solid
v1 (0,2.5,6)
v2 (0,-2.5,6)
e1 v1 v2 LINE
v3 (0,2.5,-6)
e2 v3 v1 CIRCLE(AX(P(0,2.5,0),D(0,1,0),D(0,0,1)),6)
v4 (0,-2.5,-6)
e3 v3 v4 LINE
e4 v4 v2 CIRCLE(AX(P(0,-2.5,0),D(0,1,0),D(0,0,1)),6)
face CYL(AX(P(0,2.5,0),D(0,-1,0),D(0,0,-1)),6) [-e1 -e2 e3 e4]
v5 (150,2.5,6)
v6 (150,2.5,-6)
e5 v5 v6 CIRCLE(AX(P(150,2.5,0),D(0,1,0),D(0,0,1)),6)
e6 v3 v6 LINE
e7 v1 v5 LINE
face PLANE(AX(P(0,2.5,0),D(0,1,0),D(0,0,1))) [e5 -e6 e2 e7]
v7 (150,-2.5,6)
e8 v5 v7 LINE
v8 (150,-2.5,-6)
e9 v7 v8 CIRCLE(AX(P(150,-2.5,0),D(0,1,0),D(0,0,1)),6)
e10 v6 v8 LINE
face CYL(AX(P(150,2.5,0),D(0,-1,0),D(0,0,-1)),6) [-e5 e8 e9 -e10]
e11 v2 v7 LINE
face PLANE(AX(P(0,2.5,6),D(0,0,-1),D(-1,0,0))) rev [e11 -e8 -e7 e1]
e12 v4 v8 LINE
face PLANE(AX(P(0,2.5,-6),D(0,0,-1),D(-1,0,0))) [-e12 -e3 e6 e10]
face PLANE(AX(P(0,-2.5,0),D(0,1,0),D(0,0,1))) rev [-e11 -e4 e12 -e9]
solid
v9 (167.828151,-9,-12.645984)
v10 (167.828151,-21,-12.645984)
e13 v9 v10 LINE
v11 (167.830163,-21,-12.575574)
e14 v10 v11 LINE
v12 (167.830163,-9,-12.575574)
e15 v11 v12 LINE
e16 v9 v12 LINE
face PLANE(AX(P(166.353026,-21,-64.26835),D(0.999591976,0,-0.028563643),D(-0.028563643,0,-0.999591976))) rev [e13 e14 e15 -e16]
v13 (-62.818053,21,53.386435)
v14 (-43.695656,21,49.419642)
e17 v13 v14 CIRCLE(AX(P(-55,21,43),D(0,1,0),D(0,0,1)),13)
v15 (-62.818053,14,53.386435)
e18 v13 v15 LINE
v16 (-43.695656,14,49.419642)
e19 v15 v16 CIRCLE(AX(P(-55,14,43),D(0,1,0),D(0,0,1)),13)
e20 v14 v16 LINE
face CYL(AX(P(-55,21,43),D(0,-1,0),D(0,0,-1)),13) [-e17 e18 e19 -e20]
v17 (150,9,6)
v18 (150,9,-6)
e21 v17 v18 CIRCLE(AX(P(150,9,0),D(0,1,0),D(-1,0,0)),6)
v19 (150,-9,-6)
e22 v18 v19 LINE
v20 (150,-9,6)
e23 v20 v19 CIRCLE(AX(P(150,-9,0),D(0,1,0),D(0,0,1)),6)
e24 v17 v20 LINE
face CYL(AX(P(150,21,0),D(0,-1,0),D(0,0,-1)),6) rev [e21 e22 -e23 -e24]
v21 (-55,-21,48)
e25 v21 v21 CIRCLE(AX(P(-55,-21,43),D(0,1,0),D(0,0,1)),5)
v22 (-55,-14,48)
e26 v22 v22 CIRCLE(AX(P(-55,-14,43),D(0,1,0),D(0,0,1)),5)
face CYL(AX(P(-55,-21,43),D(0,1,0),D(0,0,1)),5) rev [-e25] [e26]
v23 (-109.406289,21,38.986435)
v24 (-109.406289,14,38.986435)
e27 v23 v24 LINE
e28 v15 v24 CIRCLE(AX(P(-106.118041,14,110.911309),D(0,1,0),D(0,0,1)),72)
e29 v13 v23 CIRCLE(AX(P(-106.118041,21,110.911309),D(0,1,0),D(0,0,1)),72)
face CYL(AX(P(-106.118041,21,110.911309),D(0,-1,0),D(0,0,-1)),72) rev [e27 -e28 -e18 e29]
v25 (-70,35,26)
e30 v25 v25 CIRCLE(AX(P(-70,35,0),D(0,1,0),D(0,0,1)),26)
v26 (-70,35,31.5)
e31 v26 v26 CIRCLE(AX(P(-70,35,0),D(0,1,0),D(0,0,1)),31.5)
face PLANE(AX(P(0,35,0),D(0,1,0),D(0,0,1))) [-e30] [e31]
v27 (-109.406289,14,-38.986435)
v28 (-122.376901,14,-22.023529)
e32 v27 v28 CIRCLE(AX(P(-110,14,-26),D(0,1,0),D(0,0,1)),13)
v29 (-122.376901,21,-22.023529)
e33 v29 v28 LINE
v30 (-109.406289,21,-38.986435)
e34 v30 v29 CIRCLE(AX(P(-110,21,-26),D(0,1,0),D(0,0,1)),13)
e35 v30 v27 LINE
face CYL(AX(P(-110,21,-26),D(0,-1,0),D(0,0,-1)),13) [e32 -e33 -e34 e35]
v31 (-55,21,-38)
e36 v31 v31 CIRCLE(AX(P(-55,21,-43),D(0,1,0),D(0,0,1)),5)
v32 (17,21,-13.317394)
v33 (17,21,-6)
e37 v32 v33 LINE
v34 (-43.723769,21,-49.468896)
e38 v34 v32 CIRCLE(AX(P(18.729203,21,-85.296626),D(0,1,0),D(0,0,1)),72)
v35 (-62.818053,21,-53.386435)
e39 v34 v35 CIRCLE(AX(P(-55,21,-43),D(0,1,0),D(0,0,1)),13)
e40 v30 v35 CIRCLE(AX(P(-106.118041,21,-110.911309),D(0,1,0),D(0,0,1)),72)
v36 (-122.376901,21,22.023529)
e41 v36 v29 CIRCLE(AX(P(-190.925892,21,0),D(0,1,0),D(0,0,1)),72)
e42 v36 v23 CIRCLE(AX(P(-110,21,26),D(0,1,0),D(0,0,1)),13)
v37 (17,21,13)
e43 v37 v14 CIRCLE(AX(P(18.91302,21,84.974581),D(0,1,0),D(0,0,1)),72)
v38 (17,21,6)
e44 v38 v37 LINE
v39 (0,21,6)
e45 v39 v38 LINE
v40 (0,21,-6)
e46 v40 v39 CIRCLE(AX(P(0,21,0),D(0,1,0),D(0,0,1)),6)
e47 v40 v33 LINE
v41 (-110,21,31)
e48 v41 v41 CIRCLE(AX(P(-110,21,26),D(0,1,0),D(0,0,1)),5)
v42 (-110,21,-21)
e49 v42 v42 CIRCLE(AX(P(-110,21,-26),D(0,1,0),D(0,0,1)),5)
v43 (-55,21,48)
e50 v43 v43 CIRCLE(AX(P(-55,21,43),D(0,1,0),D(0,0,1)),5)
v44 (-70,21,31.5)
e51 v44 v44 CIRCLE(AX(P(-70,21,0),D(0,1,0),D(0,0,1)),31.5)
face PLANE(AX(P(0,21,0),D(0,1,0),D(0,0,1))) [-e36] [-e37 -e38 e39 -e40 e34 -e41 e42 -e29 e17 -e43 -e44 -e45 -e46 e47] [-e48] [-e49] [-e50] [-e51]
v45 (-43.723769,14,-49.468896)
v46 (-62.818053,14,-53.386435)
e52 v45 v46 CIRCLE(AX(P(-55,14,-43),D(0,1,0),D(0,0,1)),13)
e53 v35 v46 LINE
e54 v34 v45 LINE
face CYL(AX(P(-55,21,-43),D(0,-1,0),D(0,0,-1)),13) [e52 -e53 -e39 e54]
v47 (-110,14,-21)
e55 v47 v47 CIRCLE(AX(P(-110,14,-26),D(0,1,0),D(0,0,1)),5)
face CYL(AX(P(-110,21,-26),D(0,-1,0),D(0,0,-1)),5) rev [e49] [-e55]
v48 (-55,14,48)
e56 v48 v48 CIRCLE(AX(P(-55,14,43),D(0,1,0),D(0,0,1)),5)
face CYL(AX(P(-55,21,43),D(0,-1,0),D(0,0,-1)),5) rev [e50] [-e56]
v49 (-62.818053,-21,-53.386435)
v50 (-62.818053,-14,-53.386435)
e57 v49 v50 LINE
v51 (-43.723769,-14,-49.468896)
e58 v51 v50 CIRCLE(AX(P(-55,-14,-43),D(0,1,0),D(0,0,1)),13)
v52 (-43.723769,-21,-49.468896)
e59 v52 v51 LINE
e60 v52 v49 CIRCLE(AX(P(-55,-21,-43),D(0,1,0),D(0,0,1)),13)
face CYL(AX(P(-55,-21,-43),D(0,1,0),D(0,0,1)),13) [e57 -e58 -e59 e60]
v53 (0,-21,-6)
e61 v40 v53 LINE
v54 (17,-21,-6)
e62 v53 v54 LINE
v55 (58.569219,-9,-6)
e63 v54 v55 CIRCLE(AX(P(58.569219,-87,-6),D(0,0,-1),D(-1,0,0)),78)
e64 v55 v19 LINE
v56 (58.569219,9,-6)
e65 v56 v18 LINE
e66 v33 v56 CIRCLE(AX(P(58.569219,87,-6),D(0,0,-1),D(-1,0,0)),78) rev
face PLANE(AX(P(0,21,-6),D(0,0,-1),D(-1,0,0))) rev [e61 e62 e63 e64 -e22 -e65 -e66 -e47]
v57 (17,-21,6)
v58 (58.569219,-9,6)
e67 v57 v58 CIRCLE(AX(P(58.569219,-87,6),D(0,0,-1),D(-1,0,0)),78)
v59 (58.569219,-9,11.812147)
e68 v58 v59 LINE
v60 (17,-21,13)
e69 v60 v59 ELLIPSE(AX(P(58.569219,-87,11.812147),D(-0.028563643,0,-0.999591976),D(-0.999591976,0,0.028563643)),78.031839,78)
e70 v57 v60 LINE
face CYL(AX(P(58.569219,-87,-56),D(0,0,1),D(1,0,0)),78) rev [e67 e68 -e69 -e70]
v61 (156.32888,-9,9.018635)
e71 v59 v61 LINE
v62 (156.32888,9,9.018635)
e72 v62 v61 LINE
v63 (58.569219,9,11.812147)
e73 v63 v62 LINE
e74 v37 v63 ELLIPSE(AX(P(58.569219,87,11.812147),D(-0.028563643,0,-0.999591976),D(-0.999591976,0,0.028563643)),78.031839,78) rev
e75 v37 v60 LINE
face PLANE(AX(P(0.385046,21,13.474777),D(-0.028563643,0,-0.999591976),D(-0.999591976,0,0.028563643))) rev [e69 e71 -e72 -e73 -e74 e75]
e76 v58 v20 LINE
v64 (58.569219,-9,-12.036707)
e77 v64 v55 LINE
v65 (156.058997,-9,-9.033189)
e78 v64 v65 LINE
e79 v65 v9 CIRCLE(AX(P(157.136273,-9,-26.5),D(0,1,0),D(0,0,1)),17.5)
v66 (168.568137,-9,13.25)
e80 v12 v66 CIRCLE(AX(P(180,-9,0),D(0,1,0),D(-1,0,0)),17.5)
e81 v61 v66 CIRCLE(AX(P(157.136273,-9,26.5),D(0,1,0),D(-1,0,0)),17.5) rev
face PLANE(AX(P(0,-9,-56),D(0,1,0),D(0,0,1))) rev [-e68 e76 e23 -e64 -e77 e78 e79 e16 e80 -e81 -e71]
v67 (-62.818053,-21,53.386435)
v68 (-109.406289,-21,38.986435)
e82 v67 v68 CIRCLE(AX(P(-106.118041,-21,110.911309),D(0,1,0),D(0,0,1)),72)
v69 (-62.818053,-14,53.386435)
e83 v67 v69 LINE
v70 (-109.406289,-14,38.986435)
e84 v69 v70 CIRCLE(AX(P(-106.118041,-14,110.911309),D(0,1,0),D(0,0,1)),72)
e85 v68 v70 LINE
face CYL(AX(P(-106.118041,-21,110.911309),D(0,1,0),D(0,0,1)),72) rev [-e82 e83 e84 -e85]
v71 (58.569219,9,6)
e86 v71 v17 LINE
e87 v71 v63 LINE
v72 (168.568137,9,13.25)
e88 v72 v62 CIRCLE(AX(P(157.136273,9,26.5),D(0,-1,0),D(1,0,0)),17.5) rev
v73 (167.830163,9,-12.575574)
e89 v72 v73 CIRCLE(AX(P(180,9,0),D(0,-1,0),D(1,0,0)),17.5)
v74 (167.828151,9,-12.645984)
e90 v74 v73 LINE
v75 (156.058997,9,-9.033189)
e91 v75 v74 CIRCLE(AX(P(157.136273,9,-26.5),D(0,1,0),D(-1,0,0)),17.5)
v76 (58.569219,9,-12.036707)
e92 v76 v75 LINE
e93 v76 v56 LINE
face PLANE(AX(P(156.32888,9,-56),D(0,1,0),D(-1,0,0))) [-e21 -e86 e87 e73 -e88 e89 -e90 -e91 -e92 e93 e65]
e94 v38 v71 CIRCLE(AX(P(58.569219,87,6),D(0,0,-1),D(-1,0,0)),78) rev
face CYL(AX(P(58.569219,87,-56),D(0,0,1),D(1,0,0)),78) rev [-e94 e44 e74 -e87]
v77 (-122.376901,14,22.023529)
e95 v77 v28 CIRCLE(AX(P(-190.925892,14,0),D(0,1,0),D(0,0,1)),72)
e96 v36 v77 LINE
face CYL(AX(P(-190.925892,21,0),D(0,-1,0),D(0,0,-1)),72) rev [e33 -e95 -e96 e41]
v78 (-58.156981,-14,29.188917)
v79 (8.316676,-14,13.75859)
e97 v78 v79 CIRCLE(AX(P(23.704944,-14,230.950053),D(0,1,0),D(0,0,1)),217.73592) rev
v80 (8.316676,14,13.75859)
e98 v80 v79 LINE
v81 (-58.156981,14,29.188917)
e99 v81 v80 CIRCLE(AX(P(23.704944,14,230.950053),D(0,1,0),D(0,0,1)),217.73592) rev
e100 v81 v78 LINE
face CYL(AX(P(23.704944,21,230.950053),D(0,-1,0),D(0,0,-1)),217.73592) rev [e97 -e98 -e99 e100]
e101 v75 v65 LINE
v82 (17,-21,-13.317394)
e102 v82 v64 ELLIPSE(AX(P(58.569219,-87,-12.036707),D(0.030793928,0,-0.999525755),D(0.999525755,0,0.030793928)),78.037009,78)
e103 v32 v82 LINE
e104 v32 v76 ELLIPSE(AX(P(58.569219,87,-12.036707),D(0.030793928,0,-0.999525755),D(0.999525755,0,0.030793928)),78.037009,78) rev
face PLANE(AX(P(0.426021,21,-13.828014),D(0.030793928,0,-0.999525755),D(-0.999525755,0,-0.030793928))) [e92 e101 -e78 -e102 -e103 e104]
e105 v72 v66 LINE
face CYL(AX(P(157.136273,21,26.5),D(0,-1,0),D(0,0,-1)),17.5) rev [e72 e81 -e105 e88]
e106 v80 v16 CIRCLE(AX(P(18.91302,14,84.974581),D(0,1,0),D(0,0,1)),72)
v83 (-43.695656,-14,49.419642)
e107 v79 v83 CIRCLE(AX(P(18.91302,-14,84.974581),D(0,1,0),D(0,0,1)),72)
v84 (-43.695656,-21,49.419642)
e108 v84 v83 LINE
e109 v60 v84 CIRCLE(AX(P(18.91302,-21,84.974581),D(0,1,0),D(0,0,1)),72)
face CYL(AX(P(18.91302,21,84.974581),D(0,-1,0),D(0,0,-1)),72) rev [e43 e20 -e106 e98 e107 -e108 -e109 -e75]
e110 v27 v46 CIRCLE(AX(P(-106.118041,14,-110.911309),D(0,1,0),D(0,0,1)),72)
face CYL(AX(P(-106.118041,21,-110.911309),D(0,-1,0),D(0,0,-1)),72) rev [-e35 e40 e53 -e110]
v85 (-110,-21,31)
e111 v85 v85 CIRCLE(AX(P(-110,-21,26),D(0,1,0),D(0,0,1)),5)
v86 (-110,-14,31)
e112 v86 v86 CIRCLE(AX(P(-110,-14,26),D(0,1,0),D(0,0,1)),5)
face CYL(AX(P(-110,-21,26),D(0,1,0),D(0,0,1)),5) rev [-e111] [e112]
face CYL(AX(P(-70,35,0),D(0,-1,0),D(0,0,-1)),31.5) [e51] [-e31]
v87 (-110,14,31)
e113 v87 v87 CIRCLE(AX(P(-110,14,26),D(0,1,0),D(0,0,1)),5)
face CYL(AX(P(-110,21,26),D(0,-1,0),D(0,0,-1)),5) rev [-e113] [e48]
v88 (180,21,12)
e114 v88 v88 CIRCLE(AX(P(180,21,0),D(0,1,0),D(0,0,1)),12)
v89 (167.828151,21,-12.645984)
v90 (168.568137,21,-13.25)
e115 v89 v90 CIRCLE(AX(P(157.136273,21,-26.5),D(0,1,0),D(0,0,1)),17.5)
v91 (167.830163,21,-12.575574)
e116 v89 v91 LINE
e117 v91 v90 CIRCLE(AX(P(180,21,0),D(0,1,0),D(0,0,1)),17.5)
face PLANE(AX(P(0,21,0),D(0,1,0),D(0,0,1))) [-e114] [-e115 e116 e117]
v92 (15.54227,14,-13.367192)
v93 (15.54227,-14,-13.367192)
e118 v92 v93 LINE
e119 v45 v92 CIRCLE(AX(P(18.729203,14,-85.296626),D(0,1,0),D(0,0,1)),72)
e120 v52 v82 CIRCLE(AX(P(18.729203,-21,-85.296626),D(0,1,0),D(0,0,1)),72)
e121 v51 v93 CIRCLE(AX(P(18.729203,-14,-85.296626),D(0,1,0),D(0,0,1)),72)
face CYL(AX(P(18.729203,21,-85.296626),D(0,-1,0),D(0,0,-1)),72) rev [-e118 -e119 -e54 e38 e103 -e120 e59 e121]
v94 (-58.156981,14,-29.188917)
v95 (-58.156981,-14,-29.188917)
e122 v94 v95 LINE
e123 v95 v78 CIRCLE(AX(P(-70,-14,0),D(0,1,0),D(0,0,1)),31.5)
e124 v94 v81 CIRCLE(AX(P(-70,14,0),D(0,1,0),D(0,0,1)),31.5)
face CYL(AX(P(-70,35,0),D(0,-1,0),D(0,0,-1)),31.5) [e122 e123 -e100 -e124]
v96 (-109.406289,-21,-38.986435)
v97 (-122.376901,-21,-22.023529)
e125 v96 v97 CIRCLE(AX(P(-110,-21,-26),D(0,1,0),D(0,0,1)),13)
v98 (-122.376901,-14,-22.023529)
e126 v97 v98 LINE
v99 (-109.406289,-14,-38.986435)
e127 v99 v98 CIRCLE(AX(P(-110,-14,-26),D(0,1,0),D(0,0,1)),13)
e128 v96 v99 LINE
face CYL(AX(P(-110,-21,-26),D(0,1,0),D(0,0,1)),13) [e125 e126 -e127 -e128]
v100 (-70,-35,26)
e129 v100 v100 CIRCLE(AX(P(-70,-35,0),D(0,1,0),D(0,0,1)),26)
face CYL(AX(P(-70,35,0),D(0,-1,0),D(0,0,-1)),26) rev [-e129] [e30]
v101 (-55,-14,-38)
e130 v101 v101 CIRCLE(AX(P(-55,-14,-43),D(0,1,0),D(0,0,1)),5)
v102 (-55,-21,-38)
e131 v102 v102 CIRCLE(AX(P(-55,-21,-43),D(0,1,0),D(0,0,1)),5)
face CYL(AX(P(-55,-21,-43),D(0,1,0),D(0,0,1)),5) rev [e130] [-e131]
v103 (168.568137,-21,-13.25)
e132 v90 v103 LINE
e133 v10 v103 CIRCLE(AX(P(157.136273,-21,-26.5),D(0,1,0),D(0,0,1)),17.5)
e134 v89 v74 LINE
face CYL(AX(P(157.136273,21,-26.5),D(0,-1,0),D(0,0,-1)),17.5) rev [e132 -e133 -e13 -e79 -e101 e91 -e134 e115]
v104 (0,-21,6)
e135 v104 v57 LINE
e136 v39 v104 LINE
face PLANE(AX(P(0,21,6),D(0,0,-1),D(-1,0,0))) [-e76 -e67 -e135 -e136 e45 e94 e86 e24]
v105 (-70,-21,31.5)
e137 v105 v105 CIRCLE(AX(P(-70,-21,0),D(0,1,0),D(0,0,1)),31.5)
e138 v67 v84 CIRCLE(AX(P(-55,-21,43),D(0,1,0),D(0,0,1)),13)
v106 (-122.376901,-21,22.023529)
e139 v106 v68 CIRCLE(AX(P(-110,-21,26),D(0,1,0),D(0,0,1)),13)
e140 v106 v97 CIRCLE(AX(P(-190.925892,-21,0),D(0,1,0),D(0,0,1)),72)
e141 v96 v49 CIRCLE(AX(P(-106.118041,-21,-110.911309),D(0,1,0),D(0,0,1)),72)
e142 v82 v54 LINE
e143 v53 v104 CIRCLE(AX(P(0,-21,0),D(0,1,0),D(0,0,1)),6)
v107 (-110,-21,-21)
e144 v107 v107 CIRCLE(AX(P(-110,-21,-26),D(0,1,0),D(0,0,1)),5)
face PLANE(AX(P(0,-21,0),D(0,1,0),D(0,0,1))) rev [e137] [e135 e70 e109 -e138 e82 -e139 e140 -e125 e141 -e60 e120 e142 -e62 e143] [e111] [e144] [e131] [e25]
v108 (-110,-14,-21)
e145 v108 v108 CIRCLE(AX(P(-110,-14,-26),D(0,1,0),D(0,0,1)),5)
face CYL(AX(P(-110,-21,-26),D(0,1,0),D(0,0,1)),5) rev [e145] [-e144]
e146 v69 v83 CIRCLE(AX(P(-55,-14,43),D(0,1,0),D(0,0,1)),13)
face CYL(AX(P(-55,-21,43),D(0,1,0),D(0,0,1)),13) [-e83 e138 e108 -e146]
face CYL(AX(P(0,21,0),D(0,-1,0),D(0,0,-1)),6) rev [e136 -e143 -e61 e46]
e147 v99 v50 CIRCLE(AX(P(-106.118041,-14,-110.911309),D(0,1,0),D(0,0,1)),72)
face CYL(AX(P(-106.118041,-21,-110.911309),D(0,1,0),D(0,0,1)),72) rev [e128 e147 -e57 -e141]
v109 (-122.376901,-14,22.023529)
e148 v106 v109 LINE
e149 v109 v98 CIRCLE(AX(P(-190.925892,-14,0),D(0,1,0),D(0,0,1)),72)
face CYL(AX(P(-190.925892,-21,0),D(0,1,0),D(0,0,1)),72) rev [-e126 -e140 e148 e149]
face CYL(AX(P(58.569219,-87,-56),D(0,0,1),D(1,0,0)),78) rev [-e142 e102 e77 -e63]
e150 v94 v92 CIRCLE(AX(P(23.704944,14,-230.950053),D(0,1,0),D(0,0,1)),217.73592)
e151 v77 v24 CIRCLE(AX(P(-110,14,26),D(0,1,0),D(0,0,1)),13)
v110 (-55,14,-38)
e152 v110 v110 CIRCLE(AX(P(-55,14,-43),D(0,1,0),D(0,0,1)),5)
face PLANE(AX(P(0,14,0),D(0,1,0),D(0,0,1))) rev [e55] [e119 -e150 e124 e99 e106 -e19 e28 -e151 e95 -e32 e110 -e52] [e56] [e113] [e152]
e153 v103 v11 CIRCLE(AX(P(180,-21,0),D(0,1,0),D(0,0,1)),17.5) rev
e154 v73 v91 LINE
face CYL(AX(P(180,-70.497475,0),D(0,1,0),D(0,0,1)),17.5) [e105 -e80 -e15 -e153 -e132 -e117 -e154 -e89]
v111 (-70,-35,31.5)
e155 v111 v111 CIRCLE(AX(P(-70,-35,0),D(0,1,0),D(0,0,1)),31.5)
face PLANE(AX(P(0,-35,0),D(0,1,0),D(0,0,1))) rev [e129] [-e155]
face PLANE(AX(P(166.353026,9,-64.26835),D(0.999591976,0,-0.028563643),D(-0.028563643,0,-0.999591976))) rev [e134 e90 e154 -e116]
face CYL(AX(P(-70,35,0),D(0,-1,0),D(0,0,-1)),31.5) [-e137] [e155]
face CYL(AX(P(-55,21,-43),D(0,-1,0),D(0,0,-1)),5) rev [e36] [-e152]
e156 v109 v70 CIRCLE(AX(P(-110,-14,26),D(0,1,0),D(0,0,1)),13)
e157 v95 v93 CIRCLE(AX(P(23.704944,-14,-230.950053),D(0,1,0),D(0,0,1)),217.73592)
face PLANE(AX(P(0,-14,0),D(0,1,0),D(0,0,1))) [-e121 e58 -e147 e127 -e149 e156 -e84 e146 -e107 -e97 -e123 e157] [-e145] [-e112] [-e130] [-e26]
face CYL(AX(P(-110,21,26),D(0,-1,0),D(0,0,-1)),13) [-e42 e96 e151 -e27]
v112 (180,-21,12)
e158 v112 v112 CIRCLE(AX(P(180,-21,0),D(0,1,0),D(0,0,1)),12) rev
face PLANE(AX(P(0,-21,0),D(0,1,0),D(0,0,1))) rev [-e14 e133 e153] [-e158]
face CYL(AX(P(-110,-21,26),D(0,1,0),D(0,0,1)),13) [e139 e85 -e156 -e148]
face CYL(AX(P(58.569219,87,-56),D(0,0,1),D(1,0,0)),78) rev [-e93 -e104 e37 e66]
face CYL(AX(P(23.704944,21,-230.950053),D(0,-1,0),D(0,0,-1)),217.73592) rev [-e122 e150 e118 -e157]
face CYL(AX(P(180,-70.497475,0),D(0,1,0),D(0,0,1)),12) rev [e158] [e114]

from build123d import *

# Parameters (mm, degrees)
SKETCH1_R               = 17.5
SKETCH1_R_2             = 12
BOSS_EXTRUDE1_DEPTH     = 21
BOSS_EXTRUDE2_DEPTH     = 2.5
BOSS_EXTRUDE3_DEPTH     = 21
SKETCH1_6_R             = 31.5
SKETCH1_6_R_2           = 26
BOSS_EXTRUDE4_DEPTH     = 35
BOSS_EXTRUDE5_START     = 14
SKETCH1_8_R             = 5
BOSS_EXTRUDE5_DEPTH     = 7
BOSS_EXTRUDE6_START     = -14
SKETCH1_9_R             = 5
BOSS_EXTRUDE6_DEPTH     = 7
BOSS_EXTRUDE7_DEPTH     = 21
CUT_EXTRUDE1_DEPTH      = 209.248049211
CUT_EXTRUDE1_DEPTH_BACK = 209.248049211
CUT_EXTRUDE2_START      = -56
CUT_EXTRUDE2_DEPTH      = 56
CUT_EXTRUDE3_DEPTH      = 209.248049211
CUT_EXTRUDE3_DEPTH_BACK = 209.248049211
CUT_EXTRUDE4_DEPTH      = 212.910476009
CUT_EXTRUDE4_DEPTH_BACK = 212.910476009
SKETCH4_W               = 12.113399832
SKETCH4_H               = 12
CUT_EXTRUDE5_DEPTH      = 212.910476009
CUT_EXTRUDE5_DEPTH_BACK = 212.910476009
SKETCH4_3_W             = 12.113399832
SKETCH4_3_H             = 12
SKETCH5_R               = 17.5
SKETCH5_R_2             = 12
BOSS_EXTRUDE8_DEPTH     = 42


with BuildPart() as part:
    # Sketch1 → Boss-Extrude1 (new, symmetric)
    with BuildSketch(Plane(origin=(0, 0, 0), x_dir=(1, 0, 0), z_dir=(0, 1, 0))):
        with Locations(Location((180, 0, 0), (0, 0, 90))):
            Circle(SKETCH1_R)
        with Locations(Location((180, 0, 0), (0, 0, 90))):
            Circle(SKETCH1_R_2, mode=Mode.SUBTRACT)
    extrude(amount=BOSS_EXTRUDE1_DEPTH, both=True)


with BuildPart() as body_2:
    # Sketch1<4> → Boss-Extrude2 (new, symmetric)
    with BuildSketch(Plane(origin=(0, 0, 0), x_dir=(1, 0, 0), z_dir=(0, 1, 0))):
        with BuildLine():
            Line((0, -6), (150, -6))
            ThreePointArc((150, -6), (156, 0), (150, 6))
            Line((150, 6), (0, 6))
            ThreePointArc((0, 6), (-6, 0), (0, -6))
        make_face()
    extrude(amount=BOSS_EXTRUDE2_DEPTH, both=True)


with BuildPart() as body_3:
    # Sketch1<5> → Boss-Extrude3 (new, symmetric)
    with BuildSketch(Plane(origin=(0, 0, 0), x_dir=(1, 0, 0), z_dir=(0, 1, 0))):
        with BuildLine():
            Line((156.058996925, 9.03318931), (17, 13.317393816))
            Line((17, 13.317393816), (17, 6))
            Line((17, 6), (150, 6))
            ThreePointArc((150, 6), (156, 0), (150, -6))
            Line((150, -6), (17, -6))
            Line((17, -6), (17, -13))
            Line((17, -13), (156.328879699, -9.01863519))
            ThreePointArc((156.328879699, -9.01863519), (156.636409525, -9.007140421), (156.944093932, -9.001055257))
            ThreePointArc((156.944093932, -9.001055257), (163.144268536, -10.063638089), (168.568136635, -13.25))
            ThreePointArc((168.568136635, -13.25), (162.5, 0), (168.568136635, 13.25))
            ThreePointArc((168.568136635, 13.25), (163.234428728, 10.096875298), (157.13627327, 9))
            ThreePointArc((157.13627327, 9), (156.597379529, 9.008299295), (156.058996925, 9.03318931))
        make_face()
    extrude(amount=BOSS_EXTRUDE3_DEPTH, both=True)


with BuildPart() as body_4:
    # Sketch1<6> → Boss-Extrude4 (new, symmetric)
    with BuildSketch(Plane(origin=(0, 0, 0), x_dir=(1, 0, 0), z_dir=(0, 1, 0))):
        with Locations(Location((-70, 0, 0), (0, 0, 270))):
            Circle(SKETCH1_6_R)
        with Locations(Location((-70, 0, 0), (0, 0, 270))):
            Circle(SKETCH1_6_R_2, mode=Mode.SUBTRACT)
    extrude(amount=BOSS_EXTRUDE4_DEPTH, both=True)

    # Sketch1<8> → Boss-Extrude5 (add)
    with BuildSketch(Plane(origin=(0, 0, 0), x_dir=(1, 0, 0), z_dir=(0, 1, 0)).offset(BOSS_EXTRUDE5_START)):
        with BuildLine():
            ThreePointArc((-58.156980956, 29.188917416), (-21.997231739, 18.064539792), (15.542269663, 13.367192084))
            ThreePointArc((15.542269663, 13.367192084), (-18.727205495, 23.806647622), (-43.723768891, 49.46889573))
            ThreePointArc((-43.723768891, 49.46889573), (-52.387237507, 55.734734868), (-62.818053323, 53.386435492))
            ThreePointArc((-62.818053323, 53.386435492), (-84.855989459, 42.122318837), (-109.406288617, 38.986435492))
            ThreePointArc((-109.406288617, 38.986435492), (-120.326951915, 33.896458963), (-122.376901133, 22.023529412))
            ThreePointArc((-122.376901133, 22.023529412), (-118.925892025, 0), (-122.376901133, -22.023529412))
            ThreePointArc((-122.376901133, -22.023529412), (-120.326951915, -33.896458963), (-109.406288617, -38.986435492))
            ThreePointArc((-109.406288617, -38.986435492), (-84.855989459, -42.122318837), (-62.818053323, -53.386435492))
            ThreePointArc((-62.818053323, -53.386435492), (-52.359466146, -55.729005498), (-43.695655766, -49.419641847))
            ThreePointArc((-43.695655766, -49.419641847), (-21.801490982, -25.591683128), (8.316675692, -13.758589512))
            ThreePointArc((8.316675692, -13.758589512), (-25.528416407, -18.853360845), (-58.156980956, -29.188917416))
            ThreePointArc((-58.156980956, -29.188917416), (-101.5, 0), (-58.156980956, 29.188917416))
        make_face()
        with Locations(Location((-55, -43, 0), (0, 0, 270))):
            Circle(SKETCH1_8_R, mode=Mode.SUBTRACT)
        with Locations(Location((-110, -26, 0), (0, 0, 270))):
            Circle(SKETCH1_8_R, mode=Mode.SUBTRACT)
        with Locations(Location((-110, 26, 0), (0, 0, 270))):
            Circle(SKETCH1_8_R, mode=Mode.SUBTRACT)
        with Locations(Location((-55, 43, 0), (0, 0, 270))):
            Circle(SKETCH1_8_R, mode=Mode.SUBTRACT)
    extrude(amount=BOSS_EXTRUDE5_DEPTH)

    # Sketch1<9> → Boss-Extrude6 (add)
    with BuildSketch(Plane(origin=(0, 0, 0), x_dir=(1, 0, 0), z_dir=(0, 1, 0)).offset(BOSS_EXTRUDE6_START)):
        with BuildLine():
            ThreePointArc((-58.156980956, 29.188917416), (-21.997231739, 18.064539792), (15.542269663, 13.367192084))
            ThreePointArc((15.542269663, 13.367192084), (-18.727205495, 23.806647622), (-43.723768891, 49.46889573))
            ThreePointArc((-43.723768891, 49.46889573), (-52.387237507, 55.734734868), (-62.818053323, 53.386435492))
            ThreePointArc((-62.818053323, 53.386435492), (-84.855989459, 42.122318837), (-109.406288617, 38.986435492))
            ThreePointArc((-109.406288617, 38.986435492), (-120.326951915, 33.896458963), (-122.376901133, 22.023529412))
            ThreePointArc((-122.376901133, 22.023529412), (-118.925892025, 0), (-122.376901133, -22.023529412))
            ThreePointArc((-122.376901133, -22.023529412), (-120.326951915, -33.896458963), (-109.406288617, -38.986435492))
            ThreePointArc((-109.406288617, -38.986435492), (-84.855989459, -42.122318837), (-62.818053323, -53.386435492))
            ThreePointArc((-62.818053323, -53.386435492), (-52.359466146, -55.729005498), (-43.695655766, -49.419641847))
            ThreePointArc((-43.695655766, -49.419641847), (-21.801490982, -25.591683128), (8.316675692, -13.758589512))
            ThreePointArc((8.316675692, -13.758589512), (-25.528416407, -18.853360845), (-58.156980956, -29.188917416))
            ThreePointArc((-58.156980956, -29.188917416), (-101.5, 0), (-58.156980956, 29.188917416))
        make_face()
        with Locations(Location((-55, -43, 0), (0, 0, 270))):
            Circle(SKETCH1_9_R, mode=Mode.SUBTRACT)
        with Locations(Location((-110, -26, 0), (0, 0, 270))):
            Circle(SKETCH1_9_R, mode=Mode.SUBTRACT)
        with Locations(Location((-110, 26, 0), (0, 0, 270))):
            Circle(SKETCH1_9_R, mode=Mode.SUBTRACT)
        with Locations(Location((-55, 43, 0), (0, 0, 270))):
            Circle(SKETCH1_9_R, mode=Mode.SUBTRACT)
    extrude(amount=-BOSS_EXTRUDE6_DEPTH)


with BuildPart() as boss_extrude7_tool:
    # Sketch1<10> → Boss-Extrude7 (new, symmetric)
    with BuildSketch(Plane(origin=(0, 0, 0), x_dir=(1, 0, 0), z_dir=(0, 1, 0))):
        with BuildLine():
            Line((17, 6), (17, 13.317393816))
            ThreePointArc((17, 13.317393816), (16.271008726, 13.338601506), (15.542269663, 13.367192084))
            ThreePointArc((15.542269663, 13.367192084), (-21.997231739, 18.064539792), (-58.156980956, 29.188917416))
            ThreePointArc((-58.156980956, 29.188917416), (-43.872379558, 17.595381498), (-38.5, 0))
            Line((-38.5, 0), (-6, 0))
            ThreePointArc((-6, 0), (-4.242640687, 4.242640687), (0, 6))
            Line((0, 6), (17, 6))
        make_face()
        with BuildLine():
            ThreePointArc((0, -6), (-4.242640687, -4.242640687), (-6, 0))
            Line((-6, 0), (-38.5, 0))
            ThreePointArc((-38.5, 0), (-43.872379558, -17.595381498), (-58.156980956, -29.188917416))
            ThreePointArc((-58.156980956, -29.188917416), (-25.528416407, -18.853360845), (8.316675692, -13.758589512))
            ThreePointArc((8.316675692, -13.758589512), (12.646847854, -13.247772605), (17, -13))
            Line((17, -13), (17, -6))
            Line((17, -6), (0, -6))
        make_face()
    extrude(amount=BOSS_EXTRUDE7_DEPTH, both=True)


with BuildPart() as body_3_1:
    add(body_3.part)


with BuildPart() as body_3_2:
    # Boss-Extrude7: joined with boss_extrude7_tool
    add(body_3_1.part.fuse(boss_extrude7_tool.part, body_4.part, tol=0.00001))

    # Sketch3 → Cut-Extrude1 (cut, two sides: drawn at the far end of the back side and taken through both)
    with BuildSketch(Plane.XY.offset(-CUT_EXTRUDE1_DEPTH_BACK)):
        with BuildLine():
            Line((156.328879699, 9), (58.569219382, 9))
            ThreePointArc((58.569219382, 9), (36.935911729, 12.060024019), (17, 21))
            Line((17, 21), (156.328879699, 21))
            Line((156.328879699, 21), (156.328879699, 9))
        make_face()
    extrude(amount=CUT_EXTRUDE1_DEPTH + CUT_EXTRUDE1_DEPTH_BACK, mode=Mode.SUBTRACT)

    # Cut-Extrude2: read off the stored shape, not the designer's step
    # Cut-Extrude2 outline → Cut-Extrude2 (cut)
    with BuildSketch(Plane.XY.offset(CUT_EXTRUDE2_START)):
        with BuildLine():
            Line((17, -21), (156.328879699, -21))
            Line((156.328879699, -21), (156.328879699, -9))
            Line((156.328879699, -9), (58.569219382, -9))
            ThreePointArc((58.569219382, -9), (36.935911729, -12.060024019), (17, -21))
        make_face()
    extrude(amount=CUT_EXTRUDE2_DEPTH, mode=Mode.SUBTRACT)

    # Sketch3<5> → Cut-Extrude3 (cut, two sides: drawn at the far end of the back side and taken through both)
    with BuildSketch(Plane.XY.offset(-CUT_EXTRUDE3_DEPTH_BACK)):
        with BuildLine():
            Line((156.328879699, -9), (58.569219382, -9))
            ThreePointArc((58.569219382, -9), (36.935911729, -12.060024019), (17, -21))
            Line((17, -21), (156.328879699, -21))
            Line((156.328879699, -21), (156.328879699, -9))
        make_face()
    extrude(amount=CUT_EXTRUDE3_DEPTH + CUT_EXTRUDE3_DEPTH_BACK, mode=Mode.SUBTRACT)


with BuildPart() as cut_extrude4_tool:
    # Sketch4 → Cut-Extrude4 (new, two sides: drawn at the far end of the back side and taken through both)
    with BuildSketch(Plane(origin=(0.385045831, 0, 13.474777333), x_dir=(0.9995919759201641, 0, -0.028563642555212748), z_dir=(0.028563642555212748, 0, 0.9995919759201641)).offset(-CUT_EXTRUDE4_DEPTH_BACK)):
        with Locations((162.064188596, 15)):
            Rectangle(SKETCH4_W, SKETCH4_H)
    extrude(amount=CUT_EXTRUDE4_DEPTH + CUT_EXTRUDE4_DEPTH_BACK)


with BuildPart() as part_1:
    add(part.part)

    # Cut-Extrude4: cut by cut_extrude4_tool
    add(cut_extrude4_tool.part, mode=Mode.SUBTRACT)


with BuildPart() as body_3_3:
    add(body_3_2.part)

    # Cut-Extrude4: cut by cut_extrude4_tool
    add(cut_extrude4_tool.part, mode=Mode.SUBTRACT)


with BuildPart() as cut_extrude5_tool:
    # Sketch4<3> → Cut-Extrude5 (new, two sides: drawn at the far end of the back side and taken through both)
    with BuildSketch(Plane(origin=(0.385045831, 0, 13.474777333), x_dir=(0.9995919759201641, 0, -0.028563642555212748), z_dir=(0.028563642555212748, 0, 0.9995919759201641)).offset(-CUT_EXTRUDE5_DEPTH_BACK)):
        with Locations((162.064188596, 15)):
            Rectangle(SKETCH4_3_W, SKETCH4_3_H)
        with Locations((162.064188596, -15)):
            Rectangle(SKETCH4_3_W, SKETCH4_3_H)
    extrude(amount=CUT_EXTRUDE5_DEPTH + CUT_EXTRUDE5_DEPTH_BACK)


with BuildPart() as part_2:
    add(part_1.part)

    # Cut-Extrude5: cut by cut_extrude5_tool
    add(cut_extrude5_tool.part, mode=Mode.SUBTRACT)



with BuildPart() as body_3_4:
    add(body_3_3.part)

    # Cut-Extrude5: cut by cut_extrude5_tool
    add(cut_extrude5_tool.part, mode=Mode.SUBTRACT)


with BuildPart() as part_3:
    add(part_2.part)

    add(body_3_4.part)  # Boss-Extrude8 merges body 3
    # Sketch5 → Boss-Extrude8 (add)
    with BuildSketch(Plane(origin=(0, 21, 0), x_dir=(1, 0, 0), z_dir=(0, 1, 0))):
        with Locations((180, 0)):
            Circle(SKETCH5_R)
        with Locations(Location((180, 0, 0), (0, 0, 270))):
            Circle(SKETCH5_R_2, mode=Mode.SUBTRACT)
    extrude(amount=-BOSS_EXTRUDE8_DEPTH)


solid = Compound([body_2.part, part_3.part])
